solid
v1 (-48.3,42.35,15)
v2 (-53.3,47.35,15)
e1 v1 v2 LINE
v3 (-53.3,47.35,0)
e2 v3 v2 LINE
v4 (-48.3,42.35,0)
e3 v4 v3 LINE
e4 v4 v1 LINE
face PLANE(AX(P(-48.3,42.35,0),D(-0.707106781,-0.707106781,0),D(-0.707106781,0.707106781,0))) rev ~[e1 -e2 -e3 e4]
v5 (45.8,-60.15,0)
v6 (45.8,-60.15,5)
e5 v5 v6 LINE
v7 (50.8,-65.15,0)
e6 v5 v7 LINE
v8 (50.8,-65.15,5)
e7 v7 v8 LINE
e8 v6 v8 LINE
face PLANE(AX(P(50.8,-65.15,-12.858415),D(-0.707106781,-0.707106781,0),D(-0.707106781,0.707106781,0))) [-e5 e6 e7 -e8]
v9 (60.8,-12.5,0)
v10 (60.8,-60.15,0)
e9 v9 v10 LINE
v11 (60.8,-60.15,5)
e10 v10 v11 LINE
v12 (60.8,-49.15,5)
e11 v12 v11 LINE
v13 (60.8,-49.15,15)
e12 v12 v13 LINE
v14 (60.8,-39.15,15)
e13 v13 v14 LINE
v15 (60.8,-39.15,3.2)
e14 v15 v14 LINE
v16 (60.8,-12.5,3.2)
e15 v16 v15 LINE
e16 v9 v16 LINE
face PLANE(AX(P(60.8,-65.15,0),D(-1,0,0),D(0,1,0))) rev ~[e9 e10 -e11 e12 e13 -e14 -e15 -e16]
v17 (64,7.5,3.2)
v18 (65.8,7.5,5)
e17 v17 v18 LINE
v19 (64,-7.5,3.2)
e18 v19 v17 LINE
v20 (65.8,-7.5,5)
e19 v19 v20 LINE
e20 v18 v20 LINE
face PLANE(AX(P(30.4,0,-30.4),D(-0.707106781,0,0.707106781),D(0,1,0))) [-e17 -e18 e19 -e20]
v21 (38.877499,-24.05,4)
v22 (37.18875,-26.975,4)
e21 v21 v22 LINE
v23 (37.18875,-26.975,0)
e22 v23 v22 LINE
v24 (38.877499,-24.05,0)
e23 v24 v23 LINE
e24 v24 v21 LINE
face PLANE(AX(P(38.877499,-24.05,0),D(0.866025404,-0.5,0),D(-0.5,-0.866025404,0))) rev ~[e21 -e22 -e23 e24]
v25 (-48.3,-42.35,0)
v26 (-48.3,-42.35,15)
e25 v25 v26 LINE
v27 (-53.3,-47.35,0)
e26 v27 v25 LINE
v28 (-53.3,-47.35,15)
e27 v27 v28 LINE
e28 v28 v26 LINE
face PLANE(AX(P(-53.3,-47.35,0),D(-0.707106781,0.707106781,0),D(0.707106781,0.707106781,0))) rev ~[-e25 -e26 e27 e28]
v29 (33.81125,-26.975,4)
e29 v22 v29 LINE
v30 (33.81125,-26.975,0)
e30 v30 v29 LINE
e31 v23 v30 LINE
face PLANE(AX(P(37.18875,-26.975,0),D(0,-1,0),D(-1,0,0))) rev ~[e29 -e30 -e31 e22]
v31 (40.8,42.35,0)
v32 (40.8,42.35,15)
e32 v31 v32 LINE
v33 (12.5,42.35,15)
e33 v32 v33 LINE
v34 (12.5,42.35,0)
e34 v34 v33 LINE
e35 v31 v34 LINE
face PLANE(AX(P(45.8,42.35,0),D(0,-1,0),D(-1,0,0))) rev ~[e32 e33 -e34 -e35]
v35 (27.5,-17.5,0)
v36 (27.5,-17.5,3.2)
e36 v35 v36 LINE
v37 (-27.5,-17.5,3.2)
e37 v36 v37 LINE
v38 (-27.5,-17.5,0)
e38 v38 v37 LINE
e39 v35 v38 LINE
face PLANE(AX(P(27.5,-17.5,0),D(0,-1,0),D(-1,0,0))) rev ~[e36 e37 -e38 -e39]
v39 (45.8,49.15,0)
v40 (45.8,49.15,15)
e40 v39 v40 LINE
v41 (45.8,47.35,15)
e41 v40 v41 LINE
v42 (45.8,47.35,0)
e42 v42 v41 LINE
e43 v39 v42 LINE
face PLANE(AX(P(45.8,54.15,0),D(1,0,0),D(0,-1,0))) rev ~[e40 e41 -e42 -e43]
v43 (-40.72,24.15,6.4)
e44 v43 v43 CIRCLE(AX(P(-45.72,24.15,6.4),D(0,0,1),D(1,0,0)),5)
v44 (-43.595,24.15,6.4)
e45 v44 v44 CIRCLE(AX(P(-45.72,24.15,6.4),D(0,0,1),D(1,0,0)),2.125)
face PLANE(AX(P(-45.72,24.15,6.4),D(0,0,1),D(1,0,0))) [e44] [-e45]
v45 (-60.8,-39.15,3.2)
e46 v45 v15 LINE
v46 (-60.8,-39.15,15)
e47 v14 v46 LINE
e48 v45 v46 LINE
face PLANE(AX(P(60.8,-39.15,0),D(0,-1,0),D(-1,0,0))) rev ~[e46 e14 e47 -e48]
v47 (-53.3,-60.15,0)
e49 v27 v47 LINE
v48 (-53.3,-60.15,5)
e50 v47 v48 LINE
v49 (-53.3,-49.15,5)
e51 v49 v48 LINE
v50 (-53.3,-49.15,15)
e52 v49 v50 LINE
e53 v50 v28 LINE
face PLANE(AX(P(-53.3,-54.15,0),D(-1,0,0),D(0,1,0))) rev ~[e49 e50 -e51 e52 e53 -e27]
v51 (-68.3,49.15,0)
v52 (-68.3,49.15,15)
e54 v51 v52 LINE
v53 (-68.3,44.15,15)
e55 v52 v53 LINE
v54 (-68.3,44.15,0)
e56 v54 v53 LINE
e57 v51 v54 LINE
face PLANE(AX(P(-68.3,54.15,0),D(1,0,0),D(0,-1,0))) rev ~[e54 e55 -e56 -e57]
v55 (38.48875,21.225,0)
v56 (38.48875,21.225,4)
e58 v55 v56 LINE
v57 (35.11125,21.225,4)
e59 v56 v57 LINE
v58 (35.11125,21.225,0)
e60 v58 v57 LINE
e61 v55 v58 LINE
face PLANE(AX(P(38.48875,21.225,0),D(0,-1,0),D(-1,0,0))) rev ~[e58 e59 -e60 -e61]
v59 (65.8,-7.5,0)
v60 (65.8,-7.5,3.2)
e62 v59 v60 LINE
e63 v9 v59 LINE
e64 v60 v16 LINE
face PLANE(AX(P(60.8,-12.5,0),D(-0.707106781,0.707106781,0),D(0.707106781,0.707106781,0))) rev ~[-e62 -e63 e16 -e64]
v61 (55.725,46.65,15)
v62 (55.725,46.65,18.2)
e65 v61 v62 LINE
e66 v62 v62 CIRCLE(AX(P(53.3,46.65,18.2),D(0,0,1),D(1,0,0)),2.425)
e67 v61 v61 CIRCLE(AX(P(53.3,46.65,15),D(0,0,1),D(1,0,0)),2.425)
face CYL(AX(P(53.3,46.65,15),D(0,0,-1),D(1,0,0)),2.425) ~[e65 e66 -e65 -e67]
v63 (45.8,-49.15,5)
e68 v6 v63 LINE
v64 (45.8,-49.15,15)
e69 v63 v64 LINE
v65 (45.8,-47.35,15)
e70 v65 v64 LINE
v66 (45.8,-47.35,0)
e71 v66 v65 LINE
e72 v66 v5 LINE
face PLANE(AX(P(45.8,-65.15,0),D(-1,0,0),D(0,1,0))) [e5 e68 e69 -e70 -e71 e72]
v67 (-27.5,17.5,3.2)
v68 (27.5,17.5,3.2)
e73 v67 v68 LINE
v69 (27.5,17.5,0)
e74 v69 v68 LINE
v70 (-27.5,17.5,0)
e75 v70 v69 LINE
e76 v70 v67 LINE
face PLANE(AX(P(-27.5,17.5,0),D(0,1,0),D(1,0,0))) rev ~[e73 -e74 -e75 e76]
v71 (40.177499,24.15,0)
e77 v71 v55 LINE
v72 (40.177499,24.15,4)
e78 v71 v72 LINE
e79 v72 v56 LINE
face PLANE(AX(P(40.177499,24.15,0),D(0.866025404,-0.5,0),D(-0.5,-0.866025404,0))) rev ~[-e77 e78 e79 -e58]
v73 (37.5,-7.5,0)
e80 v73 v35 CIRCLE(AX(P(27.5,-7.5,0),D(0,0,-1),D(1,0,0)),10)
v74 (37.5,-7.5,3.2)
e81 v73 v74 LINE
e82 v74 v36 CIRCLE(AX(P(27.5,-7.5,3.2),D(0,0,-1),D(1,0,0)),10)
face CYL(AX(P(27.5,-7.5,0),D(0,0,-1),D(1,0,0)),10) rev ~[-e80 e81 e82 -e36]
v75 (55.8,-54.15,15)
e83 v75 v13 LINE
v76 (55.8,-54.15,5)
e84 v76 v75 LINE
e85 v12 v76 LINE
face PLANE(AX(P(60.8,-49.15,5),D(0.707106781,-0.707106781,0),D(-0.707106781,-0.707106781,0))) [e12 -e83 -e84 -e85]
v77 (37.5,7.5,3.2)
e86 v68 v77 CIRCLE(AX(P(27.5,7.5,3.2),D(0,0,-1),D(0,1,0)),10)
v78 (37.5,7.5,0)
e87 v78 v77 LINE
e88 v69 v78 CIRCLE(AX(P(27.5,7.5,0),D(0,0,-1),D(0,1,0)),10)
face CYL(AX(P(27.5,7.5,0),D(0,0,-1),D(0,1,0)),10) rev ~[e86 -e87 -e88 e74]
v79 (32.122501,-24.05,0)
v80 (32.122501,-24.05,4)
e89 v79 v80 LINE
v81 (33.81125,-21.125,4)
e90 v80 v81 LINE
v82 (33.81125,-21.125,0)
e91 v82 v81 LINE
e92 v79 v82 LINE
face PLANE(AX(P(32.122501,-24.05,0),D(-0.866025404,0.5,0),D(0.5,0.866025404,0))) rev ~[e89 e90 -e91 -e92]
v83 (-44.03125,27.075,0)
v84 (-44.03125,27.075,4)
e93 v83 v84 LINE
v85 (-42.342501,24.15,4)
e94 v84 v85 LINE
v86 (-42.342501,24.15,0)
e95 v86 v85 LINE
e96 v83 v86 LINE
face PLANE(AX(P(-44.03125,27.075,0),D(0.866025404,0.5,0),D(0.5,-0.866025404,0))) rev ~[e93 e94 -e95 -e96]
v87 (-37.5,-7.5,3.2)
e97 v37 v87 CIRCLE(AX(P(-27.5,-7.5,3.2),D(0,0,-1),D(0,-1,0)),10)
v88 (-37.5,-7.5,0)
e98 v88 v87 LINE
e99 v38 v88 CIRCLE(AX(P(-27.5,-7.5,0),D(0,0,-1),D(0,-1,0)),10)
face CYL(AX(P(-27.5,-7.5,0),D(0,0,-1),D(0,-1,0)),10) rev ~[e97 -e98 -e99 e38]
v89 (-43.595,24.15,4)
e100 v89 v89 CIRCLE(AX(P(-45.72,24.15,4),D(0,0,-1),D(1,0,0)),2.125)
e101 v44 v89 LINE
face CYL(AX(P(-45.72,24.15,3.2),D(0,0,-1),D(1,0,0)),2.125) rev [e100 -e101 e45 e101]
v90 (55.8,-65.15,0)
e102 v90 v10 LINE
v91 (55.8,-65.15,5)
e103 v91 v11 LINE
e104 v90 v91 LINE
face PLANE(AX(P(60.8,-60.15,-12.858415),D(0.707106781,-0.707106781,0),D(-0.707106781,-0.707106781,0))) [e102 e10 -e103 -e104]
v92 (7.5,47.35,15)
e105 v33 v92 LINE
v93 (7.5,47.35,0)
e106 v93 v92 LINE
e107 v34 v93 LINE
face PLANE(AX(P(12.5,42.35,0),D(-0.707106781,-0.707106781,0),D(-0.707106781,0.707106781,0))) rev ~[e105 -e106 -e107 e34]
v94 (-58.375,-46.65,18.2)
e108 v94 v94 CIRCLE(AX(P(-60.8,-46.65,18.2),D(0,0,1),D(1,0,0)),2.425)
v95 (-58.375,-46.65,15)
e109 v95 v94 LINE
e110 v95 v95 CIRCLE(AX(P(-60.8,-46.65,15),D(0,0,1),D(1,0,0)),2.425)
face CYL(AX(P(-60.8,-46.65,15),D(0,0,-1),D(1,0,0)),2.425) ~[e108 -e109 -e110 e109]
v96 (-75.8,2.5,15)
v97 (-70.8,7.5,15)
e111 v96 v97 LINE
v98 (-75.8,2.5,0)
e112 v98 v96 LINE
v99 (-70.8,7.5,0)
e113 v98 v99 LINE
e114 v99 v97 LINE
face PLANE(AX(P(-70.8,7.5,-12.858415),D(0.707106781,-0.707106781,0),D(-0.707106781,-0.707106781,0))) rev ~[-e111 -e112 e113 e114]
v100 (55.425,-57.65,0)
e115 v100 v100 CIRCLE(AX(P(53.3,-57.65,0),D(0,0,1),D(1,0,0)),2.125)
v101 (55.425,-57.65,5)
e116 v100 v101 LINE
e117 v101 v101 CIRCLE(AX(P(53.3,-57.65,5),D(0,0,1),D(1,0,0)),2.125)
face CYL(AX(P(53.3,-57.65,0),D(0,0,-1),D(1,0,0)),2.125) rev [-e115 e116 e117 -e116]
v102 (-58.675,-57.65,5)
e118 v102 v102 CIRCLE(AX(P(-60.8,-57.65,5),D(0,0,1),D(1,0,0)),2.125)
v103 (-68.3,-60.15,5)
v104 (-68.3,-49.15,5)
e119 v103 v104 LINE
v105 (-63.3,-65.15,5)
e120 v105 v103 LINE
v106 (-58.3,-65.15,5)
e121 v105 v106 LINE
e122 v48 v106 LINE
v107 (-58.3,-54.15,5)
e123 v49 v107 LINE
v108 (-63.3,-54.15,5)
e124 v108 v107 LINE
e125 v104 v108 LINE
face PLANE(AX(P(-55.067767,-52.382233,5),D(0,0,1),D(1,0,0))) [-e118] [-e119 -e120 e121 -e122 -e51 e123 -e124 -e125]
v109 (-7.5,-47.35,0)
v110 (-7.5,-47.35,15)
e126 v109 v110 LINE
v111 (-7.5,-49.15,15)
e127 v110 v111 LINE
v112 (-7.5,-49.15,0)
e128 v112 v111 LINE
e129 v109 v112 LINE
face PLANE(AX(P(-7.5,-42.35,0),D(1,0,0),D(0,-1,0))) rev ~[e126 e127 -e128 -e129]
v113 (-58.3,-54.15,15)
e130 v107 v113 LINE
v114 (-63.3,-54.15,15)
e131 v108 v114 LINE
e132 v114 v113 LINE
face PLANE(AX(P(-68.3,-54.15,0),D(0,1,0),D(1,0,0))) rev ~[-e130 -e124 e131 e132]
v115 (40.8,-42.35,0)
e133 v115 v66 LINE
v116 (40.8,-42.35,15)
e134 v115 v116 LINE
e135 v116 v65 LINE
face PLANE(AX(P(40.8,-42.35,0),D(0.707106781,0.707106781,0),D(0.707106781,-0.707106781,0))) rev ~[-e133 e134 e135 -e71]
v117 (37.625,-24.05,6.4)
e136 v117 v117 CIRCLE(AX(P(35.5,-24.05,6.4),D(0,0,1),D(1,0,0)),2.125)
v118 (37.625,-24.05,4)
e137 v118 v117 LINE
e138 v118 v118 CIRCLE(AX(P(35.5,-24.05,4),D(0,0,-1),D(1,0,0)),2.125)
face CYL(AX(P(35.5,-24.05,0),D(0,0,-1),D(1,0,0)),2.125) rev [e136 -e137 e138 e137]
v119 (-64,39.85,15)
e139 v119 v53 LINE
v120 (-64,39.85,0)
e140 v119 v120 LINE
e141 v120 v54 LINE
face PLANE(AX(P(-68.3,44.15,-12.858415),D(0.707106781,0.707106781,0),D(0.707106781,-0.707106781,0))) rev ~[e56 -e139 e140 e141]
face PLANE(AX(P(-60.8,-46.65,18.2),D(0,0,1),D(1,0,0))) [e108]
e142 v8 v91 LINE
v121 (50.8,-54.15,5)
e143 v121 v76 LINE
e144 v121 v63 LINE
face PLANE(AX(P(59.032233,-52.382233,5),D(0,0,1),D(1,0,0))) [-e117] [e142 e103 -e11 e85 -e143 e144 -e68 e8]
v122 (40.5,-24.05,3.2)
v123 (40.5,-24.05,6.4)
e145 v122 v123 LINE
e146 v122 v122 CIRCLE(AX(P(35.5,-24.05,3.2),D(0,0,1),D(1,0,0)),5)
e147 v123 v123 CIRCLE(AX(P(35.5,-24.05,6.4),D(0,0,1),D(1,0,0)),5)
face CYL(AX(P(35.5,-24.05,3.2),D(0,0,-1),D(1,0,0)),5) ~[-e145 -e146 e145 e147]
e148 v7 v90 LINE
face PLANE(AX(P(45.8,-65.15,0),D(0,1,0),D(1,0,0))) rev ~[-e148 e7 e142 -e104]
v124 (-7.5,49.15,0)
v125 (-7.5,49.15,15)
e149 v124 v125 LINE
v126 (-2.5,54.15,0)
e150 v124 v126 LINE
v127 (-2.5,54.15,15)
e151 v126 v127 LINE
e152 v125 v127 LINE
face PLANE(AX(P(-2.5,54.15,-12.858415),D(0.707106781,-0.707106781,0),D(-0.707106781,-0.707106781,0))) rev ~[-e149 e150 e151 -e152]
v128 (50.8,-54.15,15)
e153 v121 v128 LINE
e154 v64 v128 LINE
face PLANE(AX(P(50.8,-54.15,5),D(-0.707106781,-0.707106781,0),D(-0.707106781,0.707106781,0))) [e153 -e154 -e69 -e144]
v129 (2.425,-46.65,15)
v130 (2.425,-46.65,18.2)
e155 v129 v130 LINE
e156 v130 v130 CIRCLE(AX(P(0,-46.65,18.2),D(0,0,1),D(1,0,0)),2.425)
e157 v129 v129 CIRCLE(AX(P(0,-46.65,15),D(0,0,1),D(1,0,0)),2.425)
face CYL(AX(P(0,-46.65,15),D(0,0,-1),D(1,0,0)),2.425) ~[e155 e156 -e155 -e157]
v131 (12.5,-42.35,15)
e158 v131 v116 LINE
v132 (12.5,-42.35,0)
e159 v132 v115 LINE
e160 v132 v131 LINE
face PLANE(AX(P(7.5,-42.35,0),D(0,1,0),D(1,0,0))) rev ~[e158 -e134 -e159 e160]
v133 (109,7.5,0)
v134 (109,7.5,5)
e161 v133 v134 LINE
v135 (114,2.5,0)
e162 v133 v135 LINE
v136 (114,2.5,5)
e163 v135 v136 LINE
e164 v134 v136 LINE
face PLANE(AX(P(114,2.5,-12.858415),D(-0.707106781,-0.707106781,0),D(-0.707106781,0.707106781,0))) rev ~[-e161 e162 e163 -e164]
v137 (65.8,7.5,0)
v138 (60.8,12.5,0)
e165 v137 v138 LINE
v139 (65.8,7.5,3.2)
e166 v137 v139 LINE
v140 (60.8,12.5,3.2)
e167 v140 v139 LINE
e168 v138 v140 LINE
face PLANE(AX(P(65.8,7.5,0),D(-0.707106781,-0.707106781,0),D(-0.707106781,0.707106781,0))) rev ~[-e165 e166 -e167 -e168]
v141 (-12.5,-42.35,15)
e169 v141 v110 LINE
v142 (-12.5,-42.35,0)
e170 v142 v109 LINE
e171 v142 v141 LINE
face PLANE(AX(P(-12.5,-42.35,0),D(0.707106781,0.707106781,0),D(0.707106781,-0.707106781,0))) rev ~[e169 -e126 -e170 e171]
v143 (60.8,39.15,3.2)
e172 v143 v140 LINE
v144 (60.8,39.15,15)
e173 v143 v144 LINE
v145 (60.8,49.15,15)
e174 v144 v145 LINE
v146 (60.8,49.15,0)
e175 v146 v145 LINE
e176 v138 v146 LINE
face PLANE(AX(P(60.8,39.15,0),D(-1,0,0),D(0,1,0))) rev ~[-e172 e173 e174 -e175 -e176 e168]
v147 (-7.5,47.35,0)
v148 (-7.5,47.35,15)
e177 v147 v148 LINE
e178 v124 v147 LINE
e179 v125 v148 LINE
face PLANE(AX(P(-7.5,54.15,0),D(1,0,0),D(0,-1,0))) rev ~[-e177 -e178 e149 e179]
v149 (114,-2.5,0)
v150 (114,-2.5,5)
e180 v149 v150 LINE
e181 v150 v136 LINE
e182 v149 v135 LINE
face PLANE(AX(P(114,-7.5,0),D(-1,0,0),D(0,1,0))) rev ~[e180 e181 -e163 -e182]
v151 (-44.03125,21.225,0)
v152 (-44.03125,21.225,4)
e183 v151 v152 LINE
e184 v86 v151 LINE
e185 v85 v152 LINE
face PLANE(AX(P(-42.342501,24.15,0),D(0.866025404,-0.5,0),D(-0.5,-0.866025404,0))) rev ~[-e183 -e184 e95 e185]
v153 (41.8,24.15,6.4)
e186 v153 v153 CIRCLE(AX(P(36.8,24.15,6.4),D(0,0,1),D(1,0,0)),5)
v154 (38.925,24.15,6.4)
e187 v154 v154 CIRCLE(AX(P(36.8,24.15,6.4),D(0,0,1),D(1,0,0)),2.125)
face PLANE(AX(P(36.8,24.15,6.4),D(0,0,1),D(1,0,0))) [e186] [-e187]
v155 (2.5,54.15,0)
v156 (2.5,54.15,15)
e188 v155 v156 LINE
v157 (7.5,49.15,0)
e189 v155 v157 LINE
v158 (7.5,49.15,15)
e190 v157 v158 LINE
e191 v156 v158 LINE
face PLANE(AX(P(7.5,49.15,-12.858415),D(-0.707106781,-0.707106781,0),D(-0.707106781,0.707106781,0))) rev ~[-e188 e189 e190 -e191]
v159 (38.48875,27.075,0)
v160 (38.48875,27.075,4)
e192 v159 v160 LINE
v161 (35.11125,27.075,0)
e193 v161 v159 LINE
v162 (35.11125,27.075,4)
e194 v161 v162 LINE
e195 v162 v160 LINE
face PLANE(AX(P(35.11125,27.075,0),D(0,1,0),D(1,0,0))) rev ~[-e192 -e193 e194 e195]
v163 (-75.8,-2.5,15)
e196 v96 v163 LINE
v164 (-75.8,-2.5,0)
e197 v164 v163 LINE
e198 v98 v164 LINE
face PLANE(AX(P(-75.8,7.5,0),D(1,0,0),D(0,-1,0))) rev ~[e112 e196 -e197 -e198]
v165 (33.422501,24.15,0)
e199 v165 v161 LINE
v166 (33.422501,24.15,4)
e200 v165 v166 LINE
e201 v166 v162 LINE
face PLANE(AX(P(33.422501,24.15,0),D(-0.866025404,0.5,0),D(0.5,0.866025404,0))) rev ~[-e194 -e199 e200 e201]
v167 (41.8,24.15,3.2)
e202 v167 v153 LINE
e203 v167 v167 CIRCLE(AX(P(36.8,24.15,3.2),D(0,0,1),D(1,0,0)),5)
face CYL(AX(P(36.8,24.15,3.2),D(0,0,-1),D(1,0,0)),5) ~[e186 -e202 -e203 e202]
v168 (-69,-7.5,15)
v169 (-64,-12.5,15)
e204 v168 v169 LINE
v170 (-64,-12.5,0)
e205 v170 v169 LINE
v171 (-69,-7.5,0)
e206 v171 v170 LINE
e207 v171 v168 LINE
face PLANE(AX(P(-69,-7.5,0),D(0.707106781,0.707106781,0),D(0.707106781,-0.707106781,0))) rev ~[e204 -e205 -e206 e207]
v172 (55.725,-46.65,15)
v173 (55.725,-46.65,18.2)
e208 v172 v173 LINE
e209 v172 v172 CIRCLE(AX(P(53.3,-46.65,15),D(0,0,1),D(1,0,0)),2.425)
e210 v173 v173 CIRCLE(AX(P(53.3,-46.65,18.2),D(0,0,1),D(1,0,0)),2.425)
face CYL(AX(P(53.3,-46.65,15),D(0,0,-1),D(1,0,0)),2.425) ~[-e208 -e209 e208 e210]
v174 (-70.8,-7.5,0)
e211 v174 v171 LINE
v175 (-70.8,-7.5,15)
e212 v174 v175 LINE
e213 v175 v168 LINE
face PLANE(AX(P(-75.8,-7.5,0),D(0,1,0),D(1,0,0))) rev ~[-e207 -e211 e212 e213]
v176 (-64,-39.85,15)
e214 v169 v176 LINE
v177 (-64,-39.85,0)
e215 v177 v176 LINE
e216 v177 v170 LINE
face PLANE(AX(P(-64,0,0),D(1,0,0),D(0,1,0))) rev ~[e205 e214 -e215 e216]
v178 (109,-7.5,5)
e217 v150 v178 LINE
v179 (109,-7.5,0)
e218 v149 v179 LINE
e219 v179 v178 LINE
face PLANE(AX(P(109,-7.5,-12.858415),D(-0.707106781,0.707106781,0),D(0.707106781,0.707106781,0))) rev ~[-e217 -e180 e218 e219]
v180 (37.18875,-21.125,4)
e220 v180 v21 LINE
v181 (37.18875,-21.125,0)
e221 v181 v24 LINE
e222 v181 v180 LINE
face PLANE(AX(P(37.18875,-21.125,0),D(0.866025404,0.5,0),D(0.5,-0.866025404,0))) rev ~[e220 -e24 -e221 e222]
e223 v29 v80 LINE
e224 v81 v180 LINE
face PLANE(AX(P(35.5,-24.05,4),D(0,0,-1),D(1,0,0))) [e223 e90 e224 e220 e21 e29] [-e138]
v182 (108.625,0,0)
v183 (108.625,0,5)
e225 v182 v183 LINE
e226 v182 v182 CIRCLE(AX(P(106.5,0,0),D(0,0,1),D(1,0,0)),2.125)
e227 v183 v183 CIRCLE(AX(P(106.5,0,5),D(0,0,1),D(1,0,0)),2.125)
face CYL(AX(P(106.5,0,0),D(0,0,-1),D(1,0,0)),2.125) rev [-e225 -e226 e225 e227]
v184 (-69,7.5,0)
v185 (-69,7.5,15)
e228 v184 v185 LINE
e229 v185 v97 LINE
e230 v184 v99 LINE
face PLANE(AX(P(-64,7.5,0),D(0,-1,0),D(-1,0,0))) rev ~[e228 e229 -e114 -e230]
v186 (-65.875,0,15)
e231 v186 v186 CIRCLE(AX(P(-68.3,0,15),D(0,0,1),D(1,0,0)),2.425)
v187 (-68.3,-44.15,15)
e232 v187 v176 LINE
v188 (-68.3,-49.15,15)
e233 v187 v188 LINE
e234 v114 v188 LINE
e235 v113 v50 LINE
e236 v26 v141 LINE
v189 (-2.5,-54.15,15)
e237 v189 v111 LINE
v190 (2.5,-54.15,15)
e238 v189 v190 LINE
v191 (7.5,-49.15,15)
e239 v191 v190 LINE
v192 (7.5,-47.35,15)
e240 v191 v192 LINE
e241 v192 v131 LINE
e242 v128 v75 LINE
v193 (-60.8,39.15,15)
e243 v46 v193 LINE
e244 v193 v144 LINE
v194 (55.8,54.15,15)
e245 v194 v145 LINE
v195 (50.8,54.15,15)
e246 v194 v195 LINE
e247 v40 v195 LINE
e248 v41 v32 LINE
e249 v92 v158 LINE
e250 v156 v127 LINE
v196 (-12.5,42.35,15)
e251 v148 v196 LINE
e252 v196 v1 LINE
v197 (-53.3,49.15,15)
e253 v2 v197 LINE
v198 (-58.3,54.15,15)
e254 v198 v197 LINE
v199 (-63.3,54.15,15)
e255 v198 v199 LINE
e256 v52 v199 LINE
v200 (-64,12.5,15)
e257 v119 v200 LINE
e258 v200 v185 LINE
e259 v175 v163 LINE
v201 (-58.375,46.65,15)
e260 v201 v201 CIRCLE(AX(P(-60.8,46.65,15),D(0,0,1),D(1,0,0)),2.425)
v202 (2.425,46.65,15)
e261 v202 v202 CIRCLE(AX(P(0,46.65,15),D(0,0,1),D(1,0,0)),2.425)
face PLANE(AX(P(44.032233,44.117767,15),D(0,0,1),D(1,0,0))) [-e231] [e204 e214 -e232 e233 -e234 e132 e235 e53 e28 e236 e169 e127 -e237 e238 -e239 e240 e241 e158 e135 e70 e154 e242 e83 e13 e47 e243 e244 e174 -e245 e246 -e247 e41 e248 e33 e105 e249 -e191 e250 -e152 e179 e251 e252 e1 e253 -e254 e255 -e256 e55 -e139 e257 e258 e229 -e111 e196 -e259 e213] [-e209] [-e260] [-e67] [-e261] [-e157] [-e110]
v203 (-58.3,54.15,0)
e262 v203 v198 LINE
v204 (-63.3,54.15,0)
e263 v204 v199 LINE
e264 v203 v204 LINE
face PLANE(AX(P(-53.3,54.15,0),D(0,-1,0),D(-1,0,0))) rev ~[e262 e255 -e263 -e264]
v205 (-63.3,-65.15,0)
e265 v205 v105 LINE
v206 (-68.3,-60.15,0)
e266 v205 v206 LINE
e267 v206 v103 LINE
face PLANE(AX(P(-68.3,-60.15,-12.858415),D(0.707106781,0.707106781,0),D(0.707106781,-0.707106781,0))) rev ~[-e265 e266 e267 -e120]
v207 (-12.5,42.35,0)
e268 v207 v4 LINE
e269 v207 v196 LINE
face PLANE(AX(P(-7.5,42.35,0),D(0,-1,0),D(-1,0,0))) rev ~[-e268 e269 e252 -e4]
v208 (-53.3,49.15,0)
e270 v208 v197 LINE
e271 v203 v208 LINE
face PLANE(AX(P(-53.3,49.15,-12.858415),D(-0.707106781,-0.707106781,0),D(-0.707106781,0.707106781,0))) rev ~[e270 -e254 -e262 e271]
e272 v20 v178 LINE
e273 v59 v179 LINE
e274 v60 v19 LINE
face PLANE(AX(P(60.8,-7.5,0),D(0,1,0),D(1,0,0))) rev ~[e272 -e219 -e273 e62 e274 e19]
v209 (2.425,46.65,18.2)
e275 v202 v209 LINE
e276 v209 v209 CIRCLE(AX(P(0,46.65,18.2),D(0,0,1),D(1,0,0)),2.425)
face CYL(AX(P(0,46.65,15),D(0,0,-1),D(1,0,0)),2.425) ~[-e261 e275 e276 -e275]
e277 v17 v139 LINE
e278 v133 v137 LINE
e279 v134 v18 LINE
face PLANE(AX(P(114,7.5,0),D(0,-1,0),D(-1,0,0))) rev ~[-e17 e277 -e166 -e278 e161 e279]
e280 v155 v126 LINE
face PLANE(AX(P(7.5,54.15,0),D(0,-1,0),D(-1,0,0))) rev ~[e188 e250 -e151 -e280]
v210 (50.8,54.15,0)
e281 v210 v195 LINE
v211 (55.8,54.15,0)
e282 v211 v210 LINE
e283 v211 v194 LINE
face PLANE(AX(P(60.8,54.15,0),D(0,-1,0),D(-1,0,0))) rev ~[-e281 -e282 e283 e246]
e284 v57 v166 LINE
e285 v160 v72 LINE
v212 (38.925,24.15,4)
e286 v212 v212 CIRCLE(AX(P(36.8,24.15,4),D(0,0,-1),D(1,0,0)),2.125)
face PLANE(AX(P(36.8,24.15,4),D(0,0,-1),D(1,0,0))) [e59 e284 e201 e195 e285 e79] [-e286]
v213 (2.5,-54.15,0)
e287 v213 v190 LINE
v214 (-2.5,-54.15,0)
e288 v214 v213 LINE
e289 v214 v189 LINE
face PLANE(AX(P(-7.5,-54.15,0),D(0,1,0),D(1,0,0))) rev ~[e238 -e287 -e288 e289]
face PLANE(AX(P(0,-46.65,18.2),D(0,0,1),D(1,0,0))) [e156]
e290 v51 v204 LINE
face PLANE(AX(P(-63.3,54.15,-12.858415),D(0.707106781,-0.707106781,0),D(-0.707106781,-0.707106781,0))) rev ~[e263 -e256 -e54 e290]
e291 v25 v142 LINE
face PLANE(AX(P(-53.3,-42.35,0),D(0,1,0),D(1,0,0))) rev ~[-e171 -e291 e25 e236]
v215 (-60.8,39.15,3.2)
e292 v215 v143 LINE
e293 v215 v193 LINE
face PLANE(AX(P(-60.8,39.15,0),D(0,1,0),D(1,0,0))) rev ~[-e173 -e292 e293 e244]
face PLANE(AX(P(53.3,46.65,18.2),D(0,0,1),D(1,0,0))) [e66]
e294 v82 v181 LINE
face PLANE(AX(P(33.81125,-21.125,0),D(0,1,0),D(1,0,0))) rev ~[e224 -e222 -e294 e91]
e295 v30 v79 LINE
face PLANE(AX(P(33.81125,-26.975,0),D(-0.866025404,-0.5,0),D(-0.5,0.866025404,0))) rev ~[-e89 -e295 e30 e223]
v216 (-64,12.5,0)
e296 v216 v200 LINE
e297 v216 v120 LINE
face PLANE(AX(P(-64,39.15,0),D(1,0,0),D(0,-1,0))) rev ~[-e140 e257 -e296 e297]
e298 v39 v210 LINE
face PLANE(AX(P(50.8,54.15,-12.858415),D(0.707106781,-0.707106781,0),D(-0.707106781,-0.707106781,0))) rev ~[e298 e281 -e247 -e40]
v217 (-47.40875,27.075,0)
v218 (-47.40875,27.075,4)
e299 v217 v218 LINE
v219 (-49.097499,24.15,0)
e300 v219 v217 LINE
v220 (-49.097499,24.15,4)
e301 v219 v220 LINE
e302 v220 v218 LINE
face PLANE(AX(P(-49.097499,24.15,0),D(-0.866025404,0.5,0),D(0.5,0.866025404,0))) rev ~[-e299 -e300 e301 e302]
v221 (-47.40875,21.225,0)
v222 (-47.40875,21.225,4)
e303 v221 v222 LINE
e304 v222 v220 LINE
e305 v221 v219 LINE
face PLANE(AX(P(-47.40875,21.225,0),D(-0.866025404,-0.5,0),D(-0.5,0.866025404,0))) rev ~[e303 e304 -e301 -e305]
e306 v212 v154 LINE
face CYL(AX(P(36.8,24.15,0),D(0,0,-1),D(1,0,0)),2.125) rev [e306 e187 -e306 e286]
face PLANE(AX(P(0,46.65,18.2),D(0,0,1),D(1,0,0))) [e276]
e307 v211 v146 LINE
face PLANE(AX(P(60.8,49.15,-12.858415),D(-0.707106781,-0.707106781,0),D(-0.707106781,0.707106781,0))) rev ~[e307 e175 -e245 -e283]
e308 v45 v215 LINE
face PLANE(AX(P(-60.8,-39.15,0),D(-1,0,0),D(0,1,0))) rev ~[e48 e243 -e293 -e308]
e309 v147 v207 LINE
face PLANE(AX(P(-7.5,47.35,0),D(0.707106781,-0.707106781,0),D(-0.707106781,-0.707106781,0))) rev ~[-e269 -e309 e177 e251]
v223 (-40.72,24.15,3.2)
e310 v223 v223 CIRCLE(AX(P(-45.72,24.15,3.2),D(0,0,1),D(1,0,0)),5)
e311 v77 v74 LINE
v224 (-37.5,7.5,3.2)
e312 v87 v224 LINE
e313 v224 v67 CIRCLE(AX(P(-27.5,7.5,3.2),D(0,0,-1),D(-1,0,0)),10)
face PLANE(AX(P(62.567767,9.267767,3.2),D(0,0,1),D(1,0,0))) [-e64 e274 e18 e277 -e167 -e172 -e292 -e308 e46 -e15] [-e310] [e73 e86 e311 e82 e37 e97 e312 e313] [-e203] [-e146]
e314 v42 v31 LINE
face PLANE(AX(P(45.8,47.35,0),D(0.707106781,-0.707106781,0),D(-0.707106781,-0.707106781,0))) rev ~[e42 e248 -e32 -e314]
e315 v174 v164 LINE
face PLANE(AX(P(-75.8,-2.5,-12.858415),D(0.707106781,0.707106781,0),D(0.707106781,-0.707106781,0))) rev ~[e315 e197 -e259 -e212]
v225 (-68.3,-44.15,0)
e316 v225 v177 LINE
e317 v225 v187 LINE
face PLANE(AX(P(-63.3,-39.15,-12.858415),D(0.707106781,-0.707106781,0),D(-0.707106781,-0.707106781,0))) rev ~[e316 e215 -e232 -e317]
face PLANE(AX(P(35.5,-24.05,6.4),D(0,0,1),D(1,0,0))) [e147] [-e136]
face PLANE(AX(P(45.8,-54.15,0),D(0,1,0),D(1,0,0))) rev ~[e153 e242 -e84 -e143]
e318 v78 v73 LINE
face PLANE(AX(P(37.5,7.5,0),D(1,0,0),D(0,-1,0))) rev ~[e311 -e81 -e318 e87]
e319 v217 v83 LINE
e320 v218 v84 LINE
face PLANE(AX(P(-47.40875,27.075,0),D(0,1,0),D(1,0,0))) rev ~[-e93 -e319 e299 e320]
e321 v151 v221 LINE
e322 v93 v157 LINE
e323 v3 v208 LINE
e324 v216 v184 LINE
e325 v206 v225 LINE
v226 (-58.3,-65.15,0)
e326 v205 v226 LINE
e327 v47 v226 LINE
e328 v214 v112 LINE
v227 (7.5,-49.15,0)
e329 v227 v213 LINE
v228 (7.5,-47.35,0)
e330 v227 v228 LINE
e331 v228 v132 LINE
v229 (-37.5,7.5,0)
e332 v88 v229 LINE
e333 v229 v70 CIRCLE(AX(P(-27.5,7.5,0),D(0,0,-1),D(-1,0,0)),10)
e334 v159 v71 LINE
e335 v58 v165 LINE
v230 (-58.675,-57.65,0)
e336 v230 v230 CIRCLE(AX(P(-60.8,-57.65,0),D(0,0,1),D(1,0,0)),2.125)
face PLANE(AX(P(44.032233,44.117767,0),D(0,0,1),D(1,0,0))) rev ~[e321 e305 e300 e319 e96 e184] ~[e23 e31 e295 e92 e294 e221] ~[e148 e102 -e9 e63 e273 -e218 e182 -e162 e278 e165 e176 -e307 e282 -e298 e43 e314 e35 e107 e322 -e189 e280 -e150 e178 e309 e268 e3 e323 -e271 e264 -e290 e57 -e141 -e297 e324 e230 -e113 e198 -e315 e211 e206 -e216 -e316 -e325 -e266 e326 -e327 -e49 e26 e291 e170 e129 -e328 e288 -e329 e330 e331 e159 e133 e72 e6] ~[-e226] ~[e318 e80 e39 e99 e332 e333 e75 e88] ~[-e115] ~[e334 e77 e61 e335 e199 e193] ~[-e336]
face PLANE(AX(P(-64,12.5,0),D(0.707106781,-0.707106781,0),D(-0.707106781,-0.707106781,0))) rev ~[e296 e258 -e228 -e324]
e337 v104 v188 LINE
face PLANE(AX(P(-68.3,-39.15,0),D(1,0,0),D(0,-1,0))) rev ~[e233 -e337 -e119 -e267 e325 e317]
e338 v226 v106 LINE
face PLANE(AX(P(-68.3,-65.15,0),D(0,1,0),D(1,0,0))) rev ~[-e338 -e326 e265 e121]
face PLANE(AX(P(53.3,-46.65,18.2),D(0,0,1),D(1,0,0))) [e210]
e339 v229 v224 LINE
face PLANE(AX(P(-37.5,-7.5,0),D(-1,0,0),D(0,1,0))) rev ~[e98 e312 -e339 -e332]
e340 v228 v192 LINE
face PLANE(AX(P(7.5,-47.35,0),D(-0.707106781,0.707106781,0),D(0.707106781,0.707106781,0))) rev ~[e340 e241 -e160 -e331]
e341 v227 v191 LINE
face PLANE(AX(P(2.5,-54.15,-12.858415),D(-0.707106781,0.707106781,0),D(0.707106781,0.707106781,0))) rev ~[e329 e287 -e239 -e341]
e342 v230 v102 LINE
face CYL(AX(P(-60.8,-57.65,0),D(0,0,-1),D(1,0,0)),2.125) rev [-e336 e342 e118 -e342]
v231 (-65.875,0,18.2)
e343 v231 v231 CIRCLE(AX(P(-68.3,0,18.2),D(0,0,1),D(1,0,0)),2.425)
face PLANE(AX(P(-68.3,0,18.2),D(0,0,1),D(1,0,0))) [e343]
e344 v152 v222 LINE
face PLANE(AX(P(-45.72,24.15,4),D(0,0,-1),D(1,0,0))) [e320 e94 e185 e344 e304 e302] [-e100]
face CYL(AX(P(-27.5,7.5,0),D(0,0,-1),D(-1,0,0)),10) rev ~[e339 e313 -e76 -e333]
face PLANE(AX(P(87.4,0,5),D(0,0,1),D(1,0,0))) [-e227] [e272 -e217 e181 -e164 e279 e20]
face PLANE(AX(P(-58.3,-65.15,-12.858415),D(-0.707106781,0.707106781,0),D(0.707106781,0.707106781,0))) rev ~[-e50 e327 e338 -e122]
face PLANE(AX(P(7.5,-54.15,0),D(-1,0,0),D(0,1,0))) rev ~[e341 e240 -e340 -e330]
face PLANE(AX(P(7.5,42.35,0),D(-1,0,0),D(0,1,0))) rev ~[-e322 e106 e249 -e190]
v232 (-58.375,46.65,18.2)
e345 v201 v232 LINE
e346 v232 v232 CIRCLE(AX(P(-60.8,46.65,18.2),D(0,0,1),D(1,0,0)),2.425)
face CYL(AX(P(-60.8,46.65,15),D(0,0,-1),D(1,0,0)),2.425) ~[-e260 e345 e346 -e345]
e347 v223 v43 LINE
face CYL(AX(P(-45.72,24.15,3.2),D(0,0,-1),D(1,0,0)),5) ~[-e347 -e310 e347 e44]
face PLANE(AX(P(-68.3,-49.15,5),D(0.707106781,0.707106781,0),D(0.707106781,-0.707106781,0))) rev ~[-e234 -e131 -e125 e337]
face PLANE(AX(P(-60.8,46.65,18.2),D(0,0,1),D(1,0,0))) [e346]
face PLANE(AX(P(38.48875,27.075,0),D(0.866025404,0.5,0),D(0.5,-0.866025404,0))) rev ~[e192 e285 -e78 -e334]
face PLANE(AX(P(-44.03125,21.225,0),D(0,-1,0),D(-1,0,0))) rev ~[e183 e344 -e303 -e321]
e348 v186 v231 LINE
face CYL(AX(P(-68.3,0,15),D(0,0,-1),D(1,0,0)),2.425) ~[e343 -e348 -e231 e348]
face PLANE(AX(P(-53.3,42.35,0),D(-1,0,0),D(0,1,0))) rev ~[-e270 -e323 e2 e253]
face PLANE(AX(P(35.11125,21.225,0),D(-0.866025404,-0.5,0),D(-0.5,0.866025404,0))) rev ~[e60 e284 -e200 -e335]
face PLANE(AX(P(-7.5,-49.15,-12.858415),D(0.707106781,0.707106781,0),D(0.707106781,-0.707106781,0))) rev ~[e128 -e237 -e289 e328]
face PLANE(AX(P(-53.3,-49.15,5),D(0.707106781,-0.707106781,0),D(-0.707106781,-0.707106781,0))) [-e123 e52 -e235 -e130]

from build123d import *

# Parameters (mm, degrees)
F0_W          = 121.6
F0_H          = 78.3
F0_R          = 2.125
F1_DEPTH      = 3.2
F2_R          = 5
F2_R_2        = 2.125
F3_DEPTH      = 3.2
F5_DEPTH      = 4
F7_DEPTH      = 15
F8_R          = 2.425
F9_DEPTH      = 3.2
F11_W         = 15
F11_H         = 17.8
F11_R         = 2.125
F12_DEPTH     = 5
F13_T1_DEPTH  = 3.2
F13_T3_DEPTH  = 15
F13_T5_DEPTH  = 30.7168298797
F13_T7_DEPTH  = 22.8584149398
F13_T9_DEPTH  = 40.7168298797
F13_T14_DEPTH = 14.6584149398
F13_T19_DEPTH = 14.6584149398
F13_T24_DEPTH = 40.7168298797
F13_T29_DEPTH = 40.7168298797
F13_T34_DEPTH = 40.7168298797


# Not quite as in the source:
# - a fillet or chamfer that OpenCascade refuses, or shapes differently, is made with other operations: its cross-section is extruded or revolved along the edge and cut away or added
# - two fillets or chamfers of one size are made in one step
# - a feature of the source that left no trace in its solid (it failed there, or was rolled back) is left out
# - a feature names something its author has since deleted; it is built from what else it names


with BuildPart() as f1:
    # F0 (on Top) → F1 (new body)
    with BuildSketch(Plane.XY):
        Rectangle(F0_W, F0_H)
        with Locations((35.5, -24.05)):
            Circle(F0_R, mode=Mode.SUBTRACT)
        with BuildLine():
            ThreePointArc((37.5, -7.5), (34.5710678119, -14.5710678119), (27.5, -17.5))
            Line((27.5, -17.5), (-27.5, -17.5))
            ThreePointArc((-27.5, -17.5), (-34.5710678119, -14.5710678119), (-37.5, -7.5))
            Line((-37.5, -7.5), (-37.5, 7.5))
            ThreePointArc((-37.5, 7.5), (-34.5710678119, 14.5710678119), (-27.5, 17.5))
            Line((-27.5, 17.5), (27.5, 17.5))
            ThreePointArc((27.5, 17.5), (34.5710678119, 14.5710678119), (37.5, 7.5))
            Line((37.5, 7.5), (37.5, -7.5))
        make_face(mode=Mode.SUBTRACT)
        with Locations((-45.72, 24.15)):
            Circle(F0_R, mode=Mode.SUBTRACT)
        with Locations((36.8, 24.15)):
            Circle(F0_R, mode=Mode.SUBTRACT)
    extrude(amount=F1_DEPTH)

    # F2 (on face) → F3 (join)
    with BuildSketch(Plane.XY.offset(3.2)):
        with Locations((-45.72, 24.15)):
            Circle(F2_R)
        with Locations((-45.72, 24.15)):
            Circle(F2_R_2, mode=Mode.SUBTRACT)
        with Locations((36.8, 24.15)):
            Circle(F2_R)
        with Locations((36.8, 24.15)):
            Circle(F2_R_2, mode=Mode.SUBTRACT)
        with Locations((35.5, -24.05)):
            Circle(F2_R)
        with Locations((35.5, -24.05)):
            Circle(F2_R_2, mode=Mode.SUBTRACT)
    extrude(amount=F3_DEPTH)

    # F4 (on face) → F5 (cut)
    with BuildSketch(Plane(origin=(0, 0, 0), x_dir=(1, 0, 0), z_dir=(0, 0, -1))):
        Polygon((-44.0312504626, -21.225), (-47.4087495374, -21.225), (-49.0974990748, -24.15), (-47.4087495374, -27.075), (-44.0312504626, -27.075), (-42.3425009252, -24.15), align=None)
        Polygon((38.4887495374, -21.225), (35.1112504626, -21.225), (33.4225009252, -24.15), (35.1112504626, -27.075), (38.4887495374, -27.075), (40.1774990748, -24.15), align=None)
        Polygon((33.8112504626, 21.125), (37.1887495374, 21.125), (38.8774990748, 24.05), (37.1887495374, 26.975), (33.8112504626, 26.975), (32.1225009252, 24.05), align=None)
    extrude(amount=-F5_DEPTH, mode=Mode.SUBTRACT)

    # F6 (on Top) → F7 (join)
    with BuildSketch(Plane.XY):
        Polygon((-60.8, 39.15), (60.8, 39.15), (60.8, 54.15), (45.8, 54.15), (45.8, 42.35), (7.5, 42.35), (7.5, 54.15), (-7.5, 54.15), (-7.5, 42.35), (-53.3, 42.35), (-53.3, 54.15), (-68.3, 54.15), (-68.3, 39.15), (-64, 39.15), (-64, 7.5), (-75.8, 7.5), (-75.8, -7.5), (-64, -7.5), (-64, -39.15), (-68.3, -39.15), (-68.3, -54.15), (-53.3, -54.15), (-53.3, -42.35), (-7.5, -42.35), (-7.5, -54.15), (7.5, -54.15), (7.5, -42.35), (45.8, -42.35), (45.8, -54.15), (60.8, -54.15), (60.8, -39.15), (-60.8, -39.15), align=None)
    extrude(amount=F7_DEPTH)

    # F8 (on face) → F9 (join)
    with BuildSketch(Plane.XY.offset(15)):
        with Locations((53.3, 46.65)):
            Circle(F8_R)
        with Locations((0, 46.65)):
            Circle(F8_R)
        with Locations((-60.8, 46.65)):
            Circle(F8_R)
        with Locations((-68.3, 0)):
            Circle(F8_R)
        with Locations((-60.8, -46.65)):
            Circle(F8_R)
        with Locations((0, -46.65)):
            Circle(F8_R)
        with Locations((53.3, -46.65)):
            Circle(F8_R)
    extrude(amount=F9_DEPTH)

    # F11 (on Top) → F12 (join)
    with BuildSketch(Plane.XY):
        with Locations((53.3, -56.25)):
            Rectangle(F11_W, F11_H)
        with Locations((53.3, -57.65)):
            Circle(F11_R, mode=Mode.SUBTRACT)
        with Locations((-60.8, -56.25)):
            Rectangle(F11_W, F11_H)
        with Locations((-60.8, -57.65)):
            Circle(F11_R, mode=Mode.SUBTRACT)
        Polygon((60.8, -7.5), (64, -7.5), (114, -7.5), (114, 7.5), (64, 7.5), (60.8, 7.5), align=None)
        with Locations((106.5, 0)):
            Circle(F11_R, mode=Mode.SUBTRACT)
    extrude(amount=F12_DEPTH)

    # F13: chamfer of 5 on 37 edges, made by hand

    # F13_s2 → F13_t1 (join)
    with BuildSketch(Plane.XY):
        Polygon((65.8, 7.5), (60.8, 12.5), (60.8, 7.5), align=None)
        Polygon((60.8, -12.5), (65.8, -7.5), (60.8, -7.5), align=None)
    extrude(amount=F13_T1_DEPTH)

    # F13_s4 → F13_t3 (join)
    with BuildSketch(Plane.XY):
        Polygon((45.8, 47.35), (40.8, 42.35), (45.8, 42.35), align=None)
        Polygon((12.5, 42.35), (7.5, 47.35), (7.5, 42.35), align=None)
        Polygon((-7.5, 47.35), (-12.5, 42.35), (-7.5, 42.35), align=None)
        Polygon((-48.3, 42.35), (-53.3, 47.35), (-53.3, 42.35), align=None)
        Polygon((-64, 12.5), (-69, 7.5), (-64, 7.5), align=None)
        Polygon((-69, -7.5), (-64, -12.5), (-64, -7.5), align=None)
        Polygon((-53.3, -47.35), (-48.3, -42.35), (-53.3, -42.35), align=None)
        Polygon((-12.5, -42.35), (-7.5, -47.35), (-7.5, -42.35), align=None)
        Polygon((7.5, -47.35), (12.5, -42.35), (7.5, -42.35), align=None)
        Polygon((40.8, -42.35), (45.8, -47.35), (45.8, -42.35), align=None)
    extrude(amount=F13_T3_DEPTH)

    # F13_s6 → F13_t5 (cut)
    with BuildSketch(Plane.XY.offset(-12.8584149398)):
        Polygon((-68.3, -60.15), (-63.3, -65.15), (-68.3, -65.15), align=None)
        Polygon((-58.3, -65.15), (-53.3, -60.15), (-53.3, -65.15), align=None)
        Polygon((50.8, -65.15), (45.8, -60.15), (45.8, -65.15), align=None)
        Polygon((60.8, -60.15), (55.8, -65.15), (60.8, -65.15), align=None)
        Polygon((114, 2.5), (109, 7.5), (114, 7.5), align=None)
        Polygon((109, -7.5), (114, -2.5), (114, -7.5), align=None)
    extrude(amount=F13_T5_DEPTH, mode=Mode.SUBTRACT)

    # F13_s8 → F13_t7 (cut)
    with BuildSketch(Plane.XY.offset(5)):
        Polygon((60.8, -49.15), (55.8, -54.15), (60.8, -54.15), align=None)
        Polygon((-68.3, -49.15), (-63.3, -54.15), (-68.3, -54.15), align=None)
        Polygon((-53.3, -49.15), (-58.3, -54.15), (-53.3, -54.15), align=None)
        Polygon((50.8, -54.15), (45.8, -49.15), (45.8, -54.15), align=None)
    extrude(amount=F13_T7_DEPTH, mode=Mode.SUBTRACT)

    # F13_s10 → F13_t9 (cut)
    with BuildSketch(Plane.XY.offset(-12.8584149398)):
        Polygon((60.8, 49.15), (55.8, 54.15), (60.8, 54.15), align=None)
        Polygon((50.8, 54.15), (45.8, 49.15), (45.8, 54.15), align=None)
        Polygon((7.5, 49.15), (2.5, 54.15), (7.5, 54.15), align=None)
        Polygon((-2.5, 54.15), (-7.5, 49.15), (-7.5, 54.15), align=None)
        Polygon((-53.3, 49.15), (-58.3, 54.15), (-53.3, 54.15), align=None)
        Polygon((-63.3, 54.15), (-68.3, 49.15), (-68.3, 54.15), align=None)
        Polygon((-70.8, 7.5), (-75.8, 2.5), (-75.8, 7.5), align=None)
        Polygon((-75.8, -2.5), (-70.8, -7.5), (-75.8, -7.5), align=None)
        Polygon((-7.5, -49.15), (-2.5, -54.15), (-7.5, -54.15), align=None)
        Polygon((2.5, -54.15), (7.5, -49.15), (7.5, -54.15), align=None)
    extrude(amount=F13_T9_DEPTH, mode=Mode.SUBTRACT)


with BuildPart() as f13_tool12:
    # F13_s13 → F13_t14 (new body)
    with BuildSketch(Plane.XY.offset(3.2)):
        Polygon((65.8, 7.5), (60.8, 2.5), (60.8, 7.5), align=None)
    extrude(amount=F13_T14_DEPTH)

    split(bisect_by=Plane(origin=(30.4, 0, -30.4), x_dir=(0, 1, 0), z_dir=(-0.7071067812, 0, 0.7071067812)), keep=Keep.TOP)


with BuildPart() as f1_1:
    add(f1.part)

    # F13_t11: cut F13_tool12
    add(f13_tool12.part, mode=Mode.SUBTRACT)


with BuildPart() as f13_tool17:
    # F13_s18 → F13_t19 (new body)
    with BuildSketch(Plane.XY.offset(3.2)):
        Polygon((65.8, -7.5), (60.8, -2.5), (60.8, -7.5), align=None)
    extrude(amount=F13_T19_DEPTH)

    split(bisect_by=Plane(origin=(30.4, 0, -30.4), x_dir=(0, 1, 0), z_dir=(-0.7071067812, 0, 0.7071067812)), keep=Keep.TOP)


with BuildPart() as f1_2:
    add(f1_1.part)

    # F13_t16: cut F13_tool17
    add(f13_tool17.part, mode=Mode.SUBTRACT)


with BuildPart() as f13_tool22:
    # F13_s23 → F13_t24 (new body)
    with BuildSketch(Plane.XZ.offset(-20.3584149398)):
        Polygon((60.8, 0), (65.8, 5), (60.8, 5), align=None)
    extrude(amount=F13_T24_DEPTH)

    split(bisect_by=Plane.XY.offset(3.2), keep=Keep.TOP)


with BuildPart() as f1_3:
    add(f1_2.part)

    # F13_t21: cut F13_tool22
    add(f13_tool22.part, mode=Mode.SUBTRACT)


with BuildPart() as f13_tool27:
    # F13_s28 → F13_t29 (new body)
    with BuildSketch(Plane.XY.offset(-12.8584149398)):
        Polygon((-68.3, 44.15), (-63.3, 39.15), (-68.3, 39.15), align=None)
    extrude(amount=F13_T29_DEPTH)

    split(bisect_by=Plane.YZ.offset(-64), keep=Keep.BOTTOM)


with BuildPart() as f1_4:
    add(f1_3.part)

    # F13_t26: cut F13_tool27
    add(f13_tool27.part, mode=Mode.SUBTRACT)


with BuildPart() as f13_tool32:
    # F13_s33 → F13_t34 (new body)
    with BuildSketch(Plane.XY.offset(-12.8584149398)):
        Polygon((-63.3, -39.15), (-68.3, -44.15), (-68.3, -39.15), align=None)
    extrude(amount=F13_T34_DEPTH)

    split(bisect_by=Plane.YZ.offset(-64), keep=Keep.BOTTOM)


with BuildPart() as f1_5:
    add(f1_4.part)

    # F13_t31: cut F13_tool32
    add(f13_tool32.part, mode=Mode.SUBTRACT)


solid = f1_5.part
